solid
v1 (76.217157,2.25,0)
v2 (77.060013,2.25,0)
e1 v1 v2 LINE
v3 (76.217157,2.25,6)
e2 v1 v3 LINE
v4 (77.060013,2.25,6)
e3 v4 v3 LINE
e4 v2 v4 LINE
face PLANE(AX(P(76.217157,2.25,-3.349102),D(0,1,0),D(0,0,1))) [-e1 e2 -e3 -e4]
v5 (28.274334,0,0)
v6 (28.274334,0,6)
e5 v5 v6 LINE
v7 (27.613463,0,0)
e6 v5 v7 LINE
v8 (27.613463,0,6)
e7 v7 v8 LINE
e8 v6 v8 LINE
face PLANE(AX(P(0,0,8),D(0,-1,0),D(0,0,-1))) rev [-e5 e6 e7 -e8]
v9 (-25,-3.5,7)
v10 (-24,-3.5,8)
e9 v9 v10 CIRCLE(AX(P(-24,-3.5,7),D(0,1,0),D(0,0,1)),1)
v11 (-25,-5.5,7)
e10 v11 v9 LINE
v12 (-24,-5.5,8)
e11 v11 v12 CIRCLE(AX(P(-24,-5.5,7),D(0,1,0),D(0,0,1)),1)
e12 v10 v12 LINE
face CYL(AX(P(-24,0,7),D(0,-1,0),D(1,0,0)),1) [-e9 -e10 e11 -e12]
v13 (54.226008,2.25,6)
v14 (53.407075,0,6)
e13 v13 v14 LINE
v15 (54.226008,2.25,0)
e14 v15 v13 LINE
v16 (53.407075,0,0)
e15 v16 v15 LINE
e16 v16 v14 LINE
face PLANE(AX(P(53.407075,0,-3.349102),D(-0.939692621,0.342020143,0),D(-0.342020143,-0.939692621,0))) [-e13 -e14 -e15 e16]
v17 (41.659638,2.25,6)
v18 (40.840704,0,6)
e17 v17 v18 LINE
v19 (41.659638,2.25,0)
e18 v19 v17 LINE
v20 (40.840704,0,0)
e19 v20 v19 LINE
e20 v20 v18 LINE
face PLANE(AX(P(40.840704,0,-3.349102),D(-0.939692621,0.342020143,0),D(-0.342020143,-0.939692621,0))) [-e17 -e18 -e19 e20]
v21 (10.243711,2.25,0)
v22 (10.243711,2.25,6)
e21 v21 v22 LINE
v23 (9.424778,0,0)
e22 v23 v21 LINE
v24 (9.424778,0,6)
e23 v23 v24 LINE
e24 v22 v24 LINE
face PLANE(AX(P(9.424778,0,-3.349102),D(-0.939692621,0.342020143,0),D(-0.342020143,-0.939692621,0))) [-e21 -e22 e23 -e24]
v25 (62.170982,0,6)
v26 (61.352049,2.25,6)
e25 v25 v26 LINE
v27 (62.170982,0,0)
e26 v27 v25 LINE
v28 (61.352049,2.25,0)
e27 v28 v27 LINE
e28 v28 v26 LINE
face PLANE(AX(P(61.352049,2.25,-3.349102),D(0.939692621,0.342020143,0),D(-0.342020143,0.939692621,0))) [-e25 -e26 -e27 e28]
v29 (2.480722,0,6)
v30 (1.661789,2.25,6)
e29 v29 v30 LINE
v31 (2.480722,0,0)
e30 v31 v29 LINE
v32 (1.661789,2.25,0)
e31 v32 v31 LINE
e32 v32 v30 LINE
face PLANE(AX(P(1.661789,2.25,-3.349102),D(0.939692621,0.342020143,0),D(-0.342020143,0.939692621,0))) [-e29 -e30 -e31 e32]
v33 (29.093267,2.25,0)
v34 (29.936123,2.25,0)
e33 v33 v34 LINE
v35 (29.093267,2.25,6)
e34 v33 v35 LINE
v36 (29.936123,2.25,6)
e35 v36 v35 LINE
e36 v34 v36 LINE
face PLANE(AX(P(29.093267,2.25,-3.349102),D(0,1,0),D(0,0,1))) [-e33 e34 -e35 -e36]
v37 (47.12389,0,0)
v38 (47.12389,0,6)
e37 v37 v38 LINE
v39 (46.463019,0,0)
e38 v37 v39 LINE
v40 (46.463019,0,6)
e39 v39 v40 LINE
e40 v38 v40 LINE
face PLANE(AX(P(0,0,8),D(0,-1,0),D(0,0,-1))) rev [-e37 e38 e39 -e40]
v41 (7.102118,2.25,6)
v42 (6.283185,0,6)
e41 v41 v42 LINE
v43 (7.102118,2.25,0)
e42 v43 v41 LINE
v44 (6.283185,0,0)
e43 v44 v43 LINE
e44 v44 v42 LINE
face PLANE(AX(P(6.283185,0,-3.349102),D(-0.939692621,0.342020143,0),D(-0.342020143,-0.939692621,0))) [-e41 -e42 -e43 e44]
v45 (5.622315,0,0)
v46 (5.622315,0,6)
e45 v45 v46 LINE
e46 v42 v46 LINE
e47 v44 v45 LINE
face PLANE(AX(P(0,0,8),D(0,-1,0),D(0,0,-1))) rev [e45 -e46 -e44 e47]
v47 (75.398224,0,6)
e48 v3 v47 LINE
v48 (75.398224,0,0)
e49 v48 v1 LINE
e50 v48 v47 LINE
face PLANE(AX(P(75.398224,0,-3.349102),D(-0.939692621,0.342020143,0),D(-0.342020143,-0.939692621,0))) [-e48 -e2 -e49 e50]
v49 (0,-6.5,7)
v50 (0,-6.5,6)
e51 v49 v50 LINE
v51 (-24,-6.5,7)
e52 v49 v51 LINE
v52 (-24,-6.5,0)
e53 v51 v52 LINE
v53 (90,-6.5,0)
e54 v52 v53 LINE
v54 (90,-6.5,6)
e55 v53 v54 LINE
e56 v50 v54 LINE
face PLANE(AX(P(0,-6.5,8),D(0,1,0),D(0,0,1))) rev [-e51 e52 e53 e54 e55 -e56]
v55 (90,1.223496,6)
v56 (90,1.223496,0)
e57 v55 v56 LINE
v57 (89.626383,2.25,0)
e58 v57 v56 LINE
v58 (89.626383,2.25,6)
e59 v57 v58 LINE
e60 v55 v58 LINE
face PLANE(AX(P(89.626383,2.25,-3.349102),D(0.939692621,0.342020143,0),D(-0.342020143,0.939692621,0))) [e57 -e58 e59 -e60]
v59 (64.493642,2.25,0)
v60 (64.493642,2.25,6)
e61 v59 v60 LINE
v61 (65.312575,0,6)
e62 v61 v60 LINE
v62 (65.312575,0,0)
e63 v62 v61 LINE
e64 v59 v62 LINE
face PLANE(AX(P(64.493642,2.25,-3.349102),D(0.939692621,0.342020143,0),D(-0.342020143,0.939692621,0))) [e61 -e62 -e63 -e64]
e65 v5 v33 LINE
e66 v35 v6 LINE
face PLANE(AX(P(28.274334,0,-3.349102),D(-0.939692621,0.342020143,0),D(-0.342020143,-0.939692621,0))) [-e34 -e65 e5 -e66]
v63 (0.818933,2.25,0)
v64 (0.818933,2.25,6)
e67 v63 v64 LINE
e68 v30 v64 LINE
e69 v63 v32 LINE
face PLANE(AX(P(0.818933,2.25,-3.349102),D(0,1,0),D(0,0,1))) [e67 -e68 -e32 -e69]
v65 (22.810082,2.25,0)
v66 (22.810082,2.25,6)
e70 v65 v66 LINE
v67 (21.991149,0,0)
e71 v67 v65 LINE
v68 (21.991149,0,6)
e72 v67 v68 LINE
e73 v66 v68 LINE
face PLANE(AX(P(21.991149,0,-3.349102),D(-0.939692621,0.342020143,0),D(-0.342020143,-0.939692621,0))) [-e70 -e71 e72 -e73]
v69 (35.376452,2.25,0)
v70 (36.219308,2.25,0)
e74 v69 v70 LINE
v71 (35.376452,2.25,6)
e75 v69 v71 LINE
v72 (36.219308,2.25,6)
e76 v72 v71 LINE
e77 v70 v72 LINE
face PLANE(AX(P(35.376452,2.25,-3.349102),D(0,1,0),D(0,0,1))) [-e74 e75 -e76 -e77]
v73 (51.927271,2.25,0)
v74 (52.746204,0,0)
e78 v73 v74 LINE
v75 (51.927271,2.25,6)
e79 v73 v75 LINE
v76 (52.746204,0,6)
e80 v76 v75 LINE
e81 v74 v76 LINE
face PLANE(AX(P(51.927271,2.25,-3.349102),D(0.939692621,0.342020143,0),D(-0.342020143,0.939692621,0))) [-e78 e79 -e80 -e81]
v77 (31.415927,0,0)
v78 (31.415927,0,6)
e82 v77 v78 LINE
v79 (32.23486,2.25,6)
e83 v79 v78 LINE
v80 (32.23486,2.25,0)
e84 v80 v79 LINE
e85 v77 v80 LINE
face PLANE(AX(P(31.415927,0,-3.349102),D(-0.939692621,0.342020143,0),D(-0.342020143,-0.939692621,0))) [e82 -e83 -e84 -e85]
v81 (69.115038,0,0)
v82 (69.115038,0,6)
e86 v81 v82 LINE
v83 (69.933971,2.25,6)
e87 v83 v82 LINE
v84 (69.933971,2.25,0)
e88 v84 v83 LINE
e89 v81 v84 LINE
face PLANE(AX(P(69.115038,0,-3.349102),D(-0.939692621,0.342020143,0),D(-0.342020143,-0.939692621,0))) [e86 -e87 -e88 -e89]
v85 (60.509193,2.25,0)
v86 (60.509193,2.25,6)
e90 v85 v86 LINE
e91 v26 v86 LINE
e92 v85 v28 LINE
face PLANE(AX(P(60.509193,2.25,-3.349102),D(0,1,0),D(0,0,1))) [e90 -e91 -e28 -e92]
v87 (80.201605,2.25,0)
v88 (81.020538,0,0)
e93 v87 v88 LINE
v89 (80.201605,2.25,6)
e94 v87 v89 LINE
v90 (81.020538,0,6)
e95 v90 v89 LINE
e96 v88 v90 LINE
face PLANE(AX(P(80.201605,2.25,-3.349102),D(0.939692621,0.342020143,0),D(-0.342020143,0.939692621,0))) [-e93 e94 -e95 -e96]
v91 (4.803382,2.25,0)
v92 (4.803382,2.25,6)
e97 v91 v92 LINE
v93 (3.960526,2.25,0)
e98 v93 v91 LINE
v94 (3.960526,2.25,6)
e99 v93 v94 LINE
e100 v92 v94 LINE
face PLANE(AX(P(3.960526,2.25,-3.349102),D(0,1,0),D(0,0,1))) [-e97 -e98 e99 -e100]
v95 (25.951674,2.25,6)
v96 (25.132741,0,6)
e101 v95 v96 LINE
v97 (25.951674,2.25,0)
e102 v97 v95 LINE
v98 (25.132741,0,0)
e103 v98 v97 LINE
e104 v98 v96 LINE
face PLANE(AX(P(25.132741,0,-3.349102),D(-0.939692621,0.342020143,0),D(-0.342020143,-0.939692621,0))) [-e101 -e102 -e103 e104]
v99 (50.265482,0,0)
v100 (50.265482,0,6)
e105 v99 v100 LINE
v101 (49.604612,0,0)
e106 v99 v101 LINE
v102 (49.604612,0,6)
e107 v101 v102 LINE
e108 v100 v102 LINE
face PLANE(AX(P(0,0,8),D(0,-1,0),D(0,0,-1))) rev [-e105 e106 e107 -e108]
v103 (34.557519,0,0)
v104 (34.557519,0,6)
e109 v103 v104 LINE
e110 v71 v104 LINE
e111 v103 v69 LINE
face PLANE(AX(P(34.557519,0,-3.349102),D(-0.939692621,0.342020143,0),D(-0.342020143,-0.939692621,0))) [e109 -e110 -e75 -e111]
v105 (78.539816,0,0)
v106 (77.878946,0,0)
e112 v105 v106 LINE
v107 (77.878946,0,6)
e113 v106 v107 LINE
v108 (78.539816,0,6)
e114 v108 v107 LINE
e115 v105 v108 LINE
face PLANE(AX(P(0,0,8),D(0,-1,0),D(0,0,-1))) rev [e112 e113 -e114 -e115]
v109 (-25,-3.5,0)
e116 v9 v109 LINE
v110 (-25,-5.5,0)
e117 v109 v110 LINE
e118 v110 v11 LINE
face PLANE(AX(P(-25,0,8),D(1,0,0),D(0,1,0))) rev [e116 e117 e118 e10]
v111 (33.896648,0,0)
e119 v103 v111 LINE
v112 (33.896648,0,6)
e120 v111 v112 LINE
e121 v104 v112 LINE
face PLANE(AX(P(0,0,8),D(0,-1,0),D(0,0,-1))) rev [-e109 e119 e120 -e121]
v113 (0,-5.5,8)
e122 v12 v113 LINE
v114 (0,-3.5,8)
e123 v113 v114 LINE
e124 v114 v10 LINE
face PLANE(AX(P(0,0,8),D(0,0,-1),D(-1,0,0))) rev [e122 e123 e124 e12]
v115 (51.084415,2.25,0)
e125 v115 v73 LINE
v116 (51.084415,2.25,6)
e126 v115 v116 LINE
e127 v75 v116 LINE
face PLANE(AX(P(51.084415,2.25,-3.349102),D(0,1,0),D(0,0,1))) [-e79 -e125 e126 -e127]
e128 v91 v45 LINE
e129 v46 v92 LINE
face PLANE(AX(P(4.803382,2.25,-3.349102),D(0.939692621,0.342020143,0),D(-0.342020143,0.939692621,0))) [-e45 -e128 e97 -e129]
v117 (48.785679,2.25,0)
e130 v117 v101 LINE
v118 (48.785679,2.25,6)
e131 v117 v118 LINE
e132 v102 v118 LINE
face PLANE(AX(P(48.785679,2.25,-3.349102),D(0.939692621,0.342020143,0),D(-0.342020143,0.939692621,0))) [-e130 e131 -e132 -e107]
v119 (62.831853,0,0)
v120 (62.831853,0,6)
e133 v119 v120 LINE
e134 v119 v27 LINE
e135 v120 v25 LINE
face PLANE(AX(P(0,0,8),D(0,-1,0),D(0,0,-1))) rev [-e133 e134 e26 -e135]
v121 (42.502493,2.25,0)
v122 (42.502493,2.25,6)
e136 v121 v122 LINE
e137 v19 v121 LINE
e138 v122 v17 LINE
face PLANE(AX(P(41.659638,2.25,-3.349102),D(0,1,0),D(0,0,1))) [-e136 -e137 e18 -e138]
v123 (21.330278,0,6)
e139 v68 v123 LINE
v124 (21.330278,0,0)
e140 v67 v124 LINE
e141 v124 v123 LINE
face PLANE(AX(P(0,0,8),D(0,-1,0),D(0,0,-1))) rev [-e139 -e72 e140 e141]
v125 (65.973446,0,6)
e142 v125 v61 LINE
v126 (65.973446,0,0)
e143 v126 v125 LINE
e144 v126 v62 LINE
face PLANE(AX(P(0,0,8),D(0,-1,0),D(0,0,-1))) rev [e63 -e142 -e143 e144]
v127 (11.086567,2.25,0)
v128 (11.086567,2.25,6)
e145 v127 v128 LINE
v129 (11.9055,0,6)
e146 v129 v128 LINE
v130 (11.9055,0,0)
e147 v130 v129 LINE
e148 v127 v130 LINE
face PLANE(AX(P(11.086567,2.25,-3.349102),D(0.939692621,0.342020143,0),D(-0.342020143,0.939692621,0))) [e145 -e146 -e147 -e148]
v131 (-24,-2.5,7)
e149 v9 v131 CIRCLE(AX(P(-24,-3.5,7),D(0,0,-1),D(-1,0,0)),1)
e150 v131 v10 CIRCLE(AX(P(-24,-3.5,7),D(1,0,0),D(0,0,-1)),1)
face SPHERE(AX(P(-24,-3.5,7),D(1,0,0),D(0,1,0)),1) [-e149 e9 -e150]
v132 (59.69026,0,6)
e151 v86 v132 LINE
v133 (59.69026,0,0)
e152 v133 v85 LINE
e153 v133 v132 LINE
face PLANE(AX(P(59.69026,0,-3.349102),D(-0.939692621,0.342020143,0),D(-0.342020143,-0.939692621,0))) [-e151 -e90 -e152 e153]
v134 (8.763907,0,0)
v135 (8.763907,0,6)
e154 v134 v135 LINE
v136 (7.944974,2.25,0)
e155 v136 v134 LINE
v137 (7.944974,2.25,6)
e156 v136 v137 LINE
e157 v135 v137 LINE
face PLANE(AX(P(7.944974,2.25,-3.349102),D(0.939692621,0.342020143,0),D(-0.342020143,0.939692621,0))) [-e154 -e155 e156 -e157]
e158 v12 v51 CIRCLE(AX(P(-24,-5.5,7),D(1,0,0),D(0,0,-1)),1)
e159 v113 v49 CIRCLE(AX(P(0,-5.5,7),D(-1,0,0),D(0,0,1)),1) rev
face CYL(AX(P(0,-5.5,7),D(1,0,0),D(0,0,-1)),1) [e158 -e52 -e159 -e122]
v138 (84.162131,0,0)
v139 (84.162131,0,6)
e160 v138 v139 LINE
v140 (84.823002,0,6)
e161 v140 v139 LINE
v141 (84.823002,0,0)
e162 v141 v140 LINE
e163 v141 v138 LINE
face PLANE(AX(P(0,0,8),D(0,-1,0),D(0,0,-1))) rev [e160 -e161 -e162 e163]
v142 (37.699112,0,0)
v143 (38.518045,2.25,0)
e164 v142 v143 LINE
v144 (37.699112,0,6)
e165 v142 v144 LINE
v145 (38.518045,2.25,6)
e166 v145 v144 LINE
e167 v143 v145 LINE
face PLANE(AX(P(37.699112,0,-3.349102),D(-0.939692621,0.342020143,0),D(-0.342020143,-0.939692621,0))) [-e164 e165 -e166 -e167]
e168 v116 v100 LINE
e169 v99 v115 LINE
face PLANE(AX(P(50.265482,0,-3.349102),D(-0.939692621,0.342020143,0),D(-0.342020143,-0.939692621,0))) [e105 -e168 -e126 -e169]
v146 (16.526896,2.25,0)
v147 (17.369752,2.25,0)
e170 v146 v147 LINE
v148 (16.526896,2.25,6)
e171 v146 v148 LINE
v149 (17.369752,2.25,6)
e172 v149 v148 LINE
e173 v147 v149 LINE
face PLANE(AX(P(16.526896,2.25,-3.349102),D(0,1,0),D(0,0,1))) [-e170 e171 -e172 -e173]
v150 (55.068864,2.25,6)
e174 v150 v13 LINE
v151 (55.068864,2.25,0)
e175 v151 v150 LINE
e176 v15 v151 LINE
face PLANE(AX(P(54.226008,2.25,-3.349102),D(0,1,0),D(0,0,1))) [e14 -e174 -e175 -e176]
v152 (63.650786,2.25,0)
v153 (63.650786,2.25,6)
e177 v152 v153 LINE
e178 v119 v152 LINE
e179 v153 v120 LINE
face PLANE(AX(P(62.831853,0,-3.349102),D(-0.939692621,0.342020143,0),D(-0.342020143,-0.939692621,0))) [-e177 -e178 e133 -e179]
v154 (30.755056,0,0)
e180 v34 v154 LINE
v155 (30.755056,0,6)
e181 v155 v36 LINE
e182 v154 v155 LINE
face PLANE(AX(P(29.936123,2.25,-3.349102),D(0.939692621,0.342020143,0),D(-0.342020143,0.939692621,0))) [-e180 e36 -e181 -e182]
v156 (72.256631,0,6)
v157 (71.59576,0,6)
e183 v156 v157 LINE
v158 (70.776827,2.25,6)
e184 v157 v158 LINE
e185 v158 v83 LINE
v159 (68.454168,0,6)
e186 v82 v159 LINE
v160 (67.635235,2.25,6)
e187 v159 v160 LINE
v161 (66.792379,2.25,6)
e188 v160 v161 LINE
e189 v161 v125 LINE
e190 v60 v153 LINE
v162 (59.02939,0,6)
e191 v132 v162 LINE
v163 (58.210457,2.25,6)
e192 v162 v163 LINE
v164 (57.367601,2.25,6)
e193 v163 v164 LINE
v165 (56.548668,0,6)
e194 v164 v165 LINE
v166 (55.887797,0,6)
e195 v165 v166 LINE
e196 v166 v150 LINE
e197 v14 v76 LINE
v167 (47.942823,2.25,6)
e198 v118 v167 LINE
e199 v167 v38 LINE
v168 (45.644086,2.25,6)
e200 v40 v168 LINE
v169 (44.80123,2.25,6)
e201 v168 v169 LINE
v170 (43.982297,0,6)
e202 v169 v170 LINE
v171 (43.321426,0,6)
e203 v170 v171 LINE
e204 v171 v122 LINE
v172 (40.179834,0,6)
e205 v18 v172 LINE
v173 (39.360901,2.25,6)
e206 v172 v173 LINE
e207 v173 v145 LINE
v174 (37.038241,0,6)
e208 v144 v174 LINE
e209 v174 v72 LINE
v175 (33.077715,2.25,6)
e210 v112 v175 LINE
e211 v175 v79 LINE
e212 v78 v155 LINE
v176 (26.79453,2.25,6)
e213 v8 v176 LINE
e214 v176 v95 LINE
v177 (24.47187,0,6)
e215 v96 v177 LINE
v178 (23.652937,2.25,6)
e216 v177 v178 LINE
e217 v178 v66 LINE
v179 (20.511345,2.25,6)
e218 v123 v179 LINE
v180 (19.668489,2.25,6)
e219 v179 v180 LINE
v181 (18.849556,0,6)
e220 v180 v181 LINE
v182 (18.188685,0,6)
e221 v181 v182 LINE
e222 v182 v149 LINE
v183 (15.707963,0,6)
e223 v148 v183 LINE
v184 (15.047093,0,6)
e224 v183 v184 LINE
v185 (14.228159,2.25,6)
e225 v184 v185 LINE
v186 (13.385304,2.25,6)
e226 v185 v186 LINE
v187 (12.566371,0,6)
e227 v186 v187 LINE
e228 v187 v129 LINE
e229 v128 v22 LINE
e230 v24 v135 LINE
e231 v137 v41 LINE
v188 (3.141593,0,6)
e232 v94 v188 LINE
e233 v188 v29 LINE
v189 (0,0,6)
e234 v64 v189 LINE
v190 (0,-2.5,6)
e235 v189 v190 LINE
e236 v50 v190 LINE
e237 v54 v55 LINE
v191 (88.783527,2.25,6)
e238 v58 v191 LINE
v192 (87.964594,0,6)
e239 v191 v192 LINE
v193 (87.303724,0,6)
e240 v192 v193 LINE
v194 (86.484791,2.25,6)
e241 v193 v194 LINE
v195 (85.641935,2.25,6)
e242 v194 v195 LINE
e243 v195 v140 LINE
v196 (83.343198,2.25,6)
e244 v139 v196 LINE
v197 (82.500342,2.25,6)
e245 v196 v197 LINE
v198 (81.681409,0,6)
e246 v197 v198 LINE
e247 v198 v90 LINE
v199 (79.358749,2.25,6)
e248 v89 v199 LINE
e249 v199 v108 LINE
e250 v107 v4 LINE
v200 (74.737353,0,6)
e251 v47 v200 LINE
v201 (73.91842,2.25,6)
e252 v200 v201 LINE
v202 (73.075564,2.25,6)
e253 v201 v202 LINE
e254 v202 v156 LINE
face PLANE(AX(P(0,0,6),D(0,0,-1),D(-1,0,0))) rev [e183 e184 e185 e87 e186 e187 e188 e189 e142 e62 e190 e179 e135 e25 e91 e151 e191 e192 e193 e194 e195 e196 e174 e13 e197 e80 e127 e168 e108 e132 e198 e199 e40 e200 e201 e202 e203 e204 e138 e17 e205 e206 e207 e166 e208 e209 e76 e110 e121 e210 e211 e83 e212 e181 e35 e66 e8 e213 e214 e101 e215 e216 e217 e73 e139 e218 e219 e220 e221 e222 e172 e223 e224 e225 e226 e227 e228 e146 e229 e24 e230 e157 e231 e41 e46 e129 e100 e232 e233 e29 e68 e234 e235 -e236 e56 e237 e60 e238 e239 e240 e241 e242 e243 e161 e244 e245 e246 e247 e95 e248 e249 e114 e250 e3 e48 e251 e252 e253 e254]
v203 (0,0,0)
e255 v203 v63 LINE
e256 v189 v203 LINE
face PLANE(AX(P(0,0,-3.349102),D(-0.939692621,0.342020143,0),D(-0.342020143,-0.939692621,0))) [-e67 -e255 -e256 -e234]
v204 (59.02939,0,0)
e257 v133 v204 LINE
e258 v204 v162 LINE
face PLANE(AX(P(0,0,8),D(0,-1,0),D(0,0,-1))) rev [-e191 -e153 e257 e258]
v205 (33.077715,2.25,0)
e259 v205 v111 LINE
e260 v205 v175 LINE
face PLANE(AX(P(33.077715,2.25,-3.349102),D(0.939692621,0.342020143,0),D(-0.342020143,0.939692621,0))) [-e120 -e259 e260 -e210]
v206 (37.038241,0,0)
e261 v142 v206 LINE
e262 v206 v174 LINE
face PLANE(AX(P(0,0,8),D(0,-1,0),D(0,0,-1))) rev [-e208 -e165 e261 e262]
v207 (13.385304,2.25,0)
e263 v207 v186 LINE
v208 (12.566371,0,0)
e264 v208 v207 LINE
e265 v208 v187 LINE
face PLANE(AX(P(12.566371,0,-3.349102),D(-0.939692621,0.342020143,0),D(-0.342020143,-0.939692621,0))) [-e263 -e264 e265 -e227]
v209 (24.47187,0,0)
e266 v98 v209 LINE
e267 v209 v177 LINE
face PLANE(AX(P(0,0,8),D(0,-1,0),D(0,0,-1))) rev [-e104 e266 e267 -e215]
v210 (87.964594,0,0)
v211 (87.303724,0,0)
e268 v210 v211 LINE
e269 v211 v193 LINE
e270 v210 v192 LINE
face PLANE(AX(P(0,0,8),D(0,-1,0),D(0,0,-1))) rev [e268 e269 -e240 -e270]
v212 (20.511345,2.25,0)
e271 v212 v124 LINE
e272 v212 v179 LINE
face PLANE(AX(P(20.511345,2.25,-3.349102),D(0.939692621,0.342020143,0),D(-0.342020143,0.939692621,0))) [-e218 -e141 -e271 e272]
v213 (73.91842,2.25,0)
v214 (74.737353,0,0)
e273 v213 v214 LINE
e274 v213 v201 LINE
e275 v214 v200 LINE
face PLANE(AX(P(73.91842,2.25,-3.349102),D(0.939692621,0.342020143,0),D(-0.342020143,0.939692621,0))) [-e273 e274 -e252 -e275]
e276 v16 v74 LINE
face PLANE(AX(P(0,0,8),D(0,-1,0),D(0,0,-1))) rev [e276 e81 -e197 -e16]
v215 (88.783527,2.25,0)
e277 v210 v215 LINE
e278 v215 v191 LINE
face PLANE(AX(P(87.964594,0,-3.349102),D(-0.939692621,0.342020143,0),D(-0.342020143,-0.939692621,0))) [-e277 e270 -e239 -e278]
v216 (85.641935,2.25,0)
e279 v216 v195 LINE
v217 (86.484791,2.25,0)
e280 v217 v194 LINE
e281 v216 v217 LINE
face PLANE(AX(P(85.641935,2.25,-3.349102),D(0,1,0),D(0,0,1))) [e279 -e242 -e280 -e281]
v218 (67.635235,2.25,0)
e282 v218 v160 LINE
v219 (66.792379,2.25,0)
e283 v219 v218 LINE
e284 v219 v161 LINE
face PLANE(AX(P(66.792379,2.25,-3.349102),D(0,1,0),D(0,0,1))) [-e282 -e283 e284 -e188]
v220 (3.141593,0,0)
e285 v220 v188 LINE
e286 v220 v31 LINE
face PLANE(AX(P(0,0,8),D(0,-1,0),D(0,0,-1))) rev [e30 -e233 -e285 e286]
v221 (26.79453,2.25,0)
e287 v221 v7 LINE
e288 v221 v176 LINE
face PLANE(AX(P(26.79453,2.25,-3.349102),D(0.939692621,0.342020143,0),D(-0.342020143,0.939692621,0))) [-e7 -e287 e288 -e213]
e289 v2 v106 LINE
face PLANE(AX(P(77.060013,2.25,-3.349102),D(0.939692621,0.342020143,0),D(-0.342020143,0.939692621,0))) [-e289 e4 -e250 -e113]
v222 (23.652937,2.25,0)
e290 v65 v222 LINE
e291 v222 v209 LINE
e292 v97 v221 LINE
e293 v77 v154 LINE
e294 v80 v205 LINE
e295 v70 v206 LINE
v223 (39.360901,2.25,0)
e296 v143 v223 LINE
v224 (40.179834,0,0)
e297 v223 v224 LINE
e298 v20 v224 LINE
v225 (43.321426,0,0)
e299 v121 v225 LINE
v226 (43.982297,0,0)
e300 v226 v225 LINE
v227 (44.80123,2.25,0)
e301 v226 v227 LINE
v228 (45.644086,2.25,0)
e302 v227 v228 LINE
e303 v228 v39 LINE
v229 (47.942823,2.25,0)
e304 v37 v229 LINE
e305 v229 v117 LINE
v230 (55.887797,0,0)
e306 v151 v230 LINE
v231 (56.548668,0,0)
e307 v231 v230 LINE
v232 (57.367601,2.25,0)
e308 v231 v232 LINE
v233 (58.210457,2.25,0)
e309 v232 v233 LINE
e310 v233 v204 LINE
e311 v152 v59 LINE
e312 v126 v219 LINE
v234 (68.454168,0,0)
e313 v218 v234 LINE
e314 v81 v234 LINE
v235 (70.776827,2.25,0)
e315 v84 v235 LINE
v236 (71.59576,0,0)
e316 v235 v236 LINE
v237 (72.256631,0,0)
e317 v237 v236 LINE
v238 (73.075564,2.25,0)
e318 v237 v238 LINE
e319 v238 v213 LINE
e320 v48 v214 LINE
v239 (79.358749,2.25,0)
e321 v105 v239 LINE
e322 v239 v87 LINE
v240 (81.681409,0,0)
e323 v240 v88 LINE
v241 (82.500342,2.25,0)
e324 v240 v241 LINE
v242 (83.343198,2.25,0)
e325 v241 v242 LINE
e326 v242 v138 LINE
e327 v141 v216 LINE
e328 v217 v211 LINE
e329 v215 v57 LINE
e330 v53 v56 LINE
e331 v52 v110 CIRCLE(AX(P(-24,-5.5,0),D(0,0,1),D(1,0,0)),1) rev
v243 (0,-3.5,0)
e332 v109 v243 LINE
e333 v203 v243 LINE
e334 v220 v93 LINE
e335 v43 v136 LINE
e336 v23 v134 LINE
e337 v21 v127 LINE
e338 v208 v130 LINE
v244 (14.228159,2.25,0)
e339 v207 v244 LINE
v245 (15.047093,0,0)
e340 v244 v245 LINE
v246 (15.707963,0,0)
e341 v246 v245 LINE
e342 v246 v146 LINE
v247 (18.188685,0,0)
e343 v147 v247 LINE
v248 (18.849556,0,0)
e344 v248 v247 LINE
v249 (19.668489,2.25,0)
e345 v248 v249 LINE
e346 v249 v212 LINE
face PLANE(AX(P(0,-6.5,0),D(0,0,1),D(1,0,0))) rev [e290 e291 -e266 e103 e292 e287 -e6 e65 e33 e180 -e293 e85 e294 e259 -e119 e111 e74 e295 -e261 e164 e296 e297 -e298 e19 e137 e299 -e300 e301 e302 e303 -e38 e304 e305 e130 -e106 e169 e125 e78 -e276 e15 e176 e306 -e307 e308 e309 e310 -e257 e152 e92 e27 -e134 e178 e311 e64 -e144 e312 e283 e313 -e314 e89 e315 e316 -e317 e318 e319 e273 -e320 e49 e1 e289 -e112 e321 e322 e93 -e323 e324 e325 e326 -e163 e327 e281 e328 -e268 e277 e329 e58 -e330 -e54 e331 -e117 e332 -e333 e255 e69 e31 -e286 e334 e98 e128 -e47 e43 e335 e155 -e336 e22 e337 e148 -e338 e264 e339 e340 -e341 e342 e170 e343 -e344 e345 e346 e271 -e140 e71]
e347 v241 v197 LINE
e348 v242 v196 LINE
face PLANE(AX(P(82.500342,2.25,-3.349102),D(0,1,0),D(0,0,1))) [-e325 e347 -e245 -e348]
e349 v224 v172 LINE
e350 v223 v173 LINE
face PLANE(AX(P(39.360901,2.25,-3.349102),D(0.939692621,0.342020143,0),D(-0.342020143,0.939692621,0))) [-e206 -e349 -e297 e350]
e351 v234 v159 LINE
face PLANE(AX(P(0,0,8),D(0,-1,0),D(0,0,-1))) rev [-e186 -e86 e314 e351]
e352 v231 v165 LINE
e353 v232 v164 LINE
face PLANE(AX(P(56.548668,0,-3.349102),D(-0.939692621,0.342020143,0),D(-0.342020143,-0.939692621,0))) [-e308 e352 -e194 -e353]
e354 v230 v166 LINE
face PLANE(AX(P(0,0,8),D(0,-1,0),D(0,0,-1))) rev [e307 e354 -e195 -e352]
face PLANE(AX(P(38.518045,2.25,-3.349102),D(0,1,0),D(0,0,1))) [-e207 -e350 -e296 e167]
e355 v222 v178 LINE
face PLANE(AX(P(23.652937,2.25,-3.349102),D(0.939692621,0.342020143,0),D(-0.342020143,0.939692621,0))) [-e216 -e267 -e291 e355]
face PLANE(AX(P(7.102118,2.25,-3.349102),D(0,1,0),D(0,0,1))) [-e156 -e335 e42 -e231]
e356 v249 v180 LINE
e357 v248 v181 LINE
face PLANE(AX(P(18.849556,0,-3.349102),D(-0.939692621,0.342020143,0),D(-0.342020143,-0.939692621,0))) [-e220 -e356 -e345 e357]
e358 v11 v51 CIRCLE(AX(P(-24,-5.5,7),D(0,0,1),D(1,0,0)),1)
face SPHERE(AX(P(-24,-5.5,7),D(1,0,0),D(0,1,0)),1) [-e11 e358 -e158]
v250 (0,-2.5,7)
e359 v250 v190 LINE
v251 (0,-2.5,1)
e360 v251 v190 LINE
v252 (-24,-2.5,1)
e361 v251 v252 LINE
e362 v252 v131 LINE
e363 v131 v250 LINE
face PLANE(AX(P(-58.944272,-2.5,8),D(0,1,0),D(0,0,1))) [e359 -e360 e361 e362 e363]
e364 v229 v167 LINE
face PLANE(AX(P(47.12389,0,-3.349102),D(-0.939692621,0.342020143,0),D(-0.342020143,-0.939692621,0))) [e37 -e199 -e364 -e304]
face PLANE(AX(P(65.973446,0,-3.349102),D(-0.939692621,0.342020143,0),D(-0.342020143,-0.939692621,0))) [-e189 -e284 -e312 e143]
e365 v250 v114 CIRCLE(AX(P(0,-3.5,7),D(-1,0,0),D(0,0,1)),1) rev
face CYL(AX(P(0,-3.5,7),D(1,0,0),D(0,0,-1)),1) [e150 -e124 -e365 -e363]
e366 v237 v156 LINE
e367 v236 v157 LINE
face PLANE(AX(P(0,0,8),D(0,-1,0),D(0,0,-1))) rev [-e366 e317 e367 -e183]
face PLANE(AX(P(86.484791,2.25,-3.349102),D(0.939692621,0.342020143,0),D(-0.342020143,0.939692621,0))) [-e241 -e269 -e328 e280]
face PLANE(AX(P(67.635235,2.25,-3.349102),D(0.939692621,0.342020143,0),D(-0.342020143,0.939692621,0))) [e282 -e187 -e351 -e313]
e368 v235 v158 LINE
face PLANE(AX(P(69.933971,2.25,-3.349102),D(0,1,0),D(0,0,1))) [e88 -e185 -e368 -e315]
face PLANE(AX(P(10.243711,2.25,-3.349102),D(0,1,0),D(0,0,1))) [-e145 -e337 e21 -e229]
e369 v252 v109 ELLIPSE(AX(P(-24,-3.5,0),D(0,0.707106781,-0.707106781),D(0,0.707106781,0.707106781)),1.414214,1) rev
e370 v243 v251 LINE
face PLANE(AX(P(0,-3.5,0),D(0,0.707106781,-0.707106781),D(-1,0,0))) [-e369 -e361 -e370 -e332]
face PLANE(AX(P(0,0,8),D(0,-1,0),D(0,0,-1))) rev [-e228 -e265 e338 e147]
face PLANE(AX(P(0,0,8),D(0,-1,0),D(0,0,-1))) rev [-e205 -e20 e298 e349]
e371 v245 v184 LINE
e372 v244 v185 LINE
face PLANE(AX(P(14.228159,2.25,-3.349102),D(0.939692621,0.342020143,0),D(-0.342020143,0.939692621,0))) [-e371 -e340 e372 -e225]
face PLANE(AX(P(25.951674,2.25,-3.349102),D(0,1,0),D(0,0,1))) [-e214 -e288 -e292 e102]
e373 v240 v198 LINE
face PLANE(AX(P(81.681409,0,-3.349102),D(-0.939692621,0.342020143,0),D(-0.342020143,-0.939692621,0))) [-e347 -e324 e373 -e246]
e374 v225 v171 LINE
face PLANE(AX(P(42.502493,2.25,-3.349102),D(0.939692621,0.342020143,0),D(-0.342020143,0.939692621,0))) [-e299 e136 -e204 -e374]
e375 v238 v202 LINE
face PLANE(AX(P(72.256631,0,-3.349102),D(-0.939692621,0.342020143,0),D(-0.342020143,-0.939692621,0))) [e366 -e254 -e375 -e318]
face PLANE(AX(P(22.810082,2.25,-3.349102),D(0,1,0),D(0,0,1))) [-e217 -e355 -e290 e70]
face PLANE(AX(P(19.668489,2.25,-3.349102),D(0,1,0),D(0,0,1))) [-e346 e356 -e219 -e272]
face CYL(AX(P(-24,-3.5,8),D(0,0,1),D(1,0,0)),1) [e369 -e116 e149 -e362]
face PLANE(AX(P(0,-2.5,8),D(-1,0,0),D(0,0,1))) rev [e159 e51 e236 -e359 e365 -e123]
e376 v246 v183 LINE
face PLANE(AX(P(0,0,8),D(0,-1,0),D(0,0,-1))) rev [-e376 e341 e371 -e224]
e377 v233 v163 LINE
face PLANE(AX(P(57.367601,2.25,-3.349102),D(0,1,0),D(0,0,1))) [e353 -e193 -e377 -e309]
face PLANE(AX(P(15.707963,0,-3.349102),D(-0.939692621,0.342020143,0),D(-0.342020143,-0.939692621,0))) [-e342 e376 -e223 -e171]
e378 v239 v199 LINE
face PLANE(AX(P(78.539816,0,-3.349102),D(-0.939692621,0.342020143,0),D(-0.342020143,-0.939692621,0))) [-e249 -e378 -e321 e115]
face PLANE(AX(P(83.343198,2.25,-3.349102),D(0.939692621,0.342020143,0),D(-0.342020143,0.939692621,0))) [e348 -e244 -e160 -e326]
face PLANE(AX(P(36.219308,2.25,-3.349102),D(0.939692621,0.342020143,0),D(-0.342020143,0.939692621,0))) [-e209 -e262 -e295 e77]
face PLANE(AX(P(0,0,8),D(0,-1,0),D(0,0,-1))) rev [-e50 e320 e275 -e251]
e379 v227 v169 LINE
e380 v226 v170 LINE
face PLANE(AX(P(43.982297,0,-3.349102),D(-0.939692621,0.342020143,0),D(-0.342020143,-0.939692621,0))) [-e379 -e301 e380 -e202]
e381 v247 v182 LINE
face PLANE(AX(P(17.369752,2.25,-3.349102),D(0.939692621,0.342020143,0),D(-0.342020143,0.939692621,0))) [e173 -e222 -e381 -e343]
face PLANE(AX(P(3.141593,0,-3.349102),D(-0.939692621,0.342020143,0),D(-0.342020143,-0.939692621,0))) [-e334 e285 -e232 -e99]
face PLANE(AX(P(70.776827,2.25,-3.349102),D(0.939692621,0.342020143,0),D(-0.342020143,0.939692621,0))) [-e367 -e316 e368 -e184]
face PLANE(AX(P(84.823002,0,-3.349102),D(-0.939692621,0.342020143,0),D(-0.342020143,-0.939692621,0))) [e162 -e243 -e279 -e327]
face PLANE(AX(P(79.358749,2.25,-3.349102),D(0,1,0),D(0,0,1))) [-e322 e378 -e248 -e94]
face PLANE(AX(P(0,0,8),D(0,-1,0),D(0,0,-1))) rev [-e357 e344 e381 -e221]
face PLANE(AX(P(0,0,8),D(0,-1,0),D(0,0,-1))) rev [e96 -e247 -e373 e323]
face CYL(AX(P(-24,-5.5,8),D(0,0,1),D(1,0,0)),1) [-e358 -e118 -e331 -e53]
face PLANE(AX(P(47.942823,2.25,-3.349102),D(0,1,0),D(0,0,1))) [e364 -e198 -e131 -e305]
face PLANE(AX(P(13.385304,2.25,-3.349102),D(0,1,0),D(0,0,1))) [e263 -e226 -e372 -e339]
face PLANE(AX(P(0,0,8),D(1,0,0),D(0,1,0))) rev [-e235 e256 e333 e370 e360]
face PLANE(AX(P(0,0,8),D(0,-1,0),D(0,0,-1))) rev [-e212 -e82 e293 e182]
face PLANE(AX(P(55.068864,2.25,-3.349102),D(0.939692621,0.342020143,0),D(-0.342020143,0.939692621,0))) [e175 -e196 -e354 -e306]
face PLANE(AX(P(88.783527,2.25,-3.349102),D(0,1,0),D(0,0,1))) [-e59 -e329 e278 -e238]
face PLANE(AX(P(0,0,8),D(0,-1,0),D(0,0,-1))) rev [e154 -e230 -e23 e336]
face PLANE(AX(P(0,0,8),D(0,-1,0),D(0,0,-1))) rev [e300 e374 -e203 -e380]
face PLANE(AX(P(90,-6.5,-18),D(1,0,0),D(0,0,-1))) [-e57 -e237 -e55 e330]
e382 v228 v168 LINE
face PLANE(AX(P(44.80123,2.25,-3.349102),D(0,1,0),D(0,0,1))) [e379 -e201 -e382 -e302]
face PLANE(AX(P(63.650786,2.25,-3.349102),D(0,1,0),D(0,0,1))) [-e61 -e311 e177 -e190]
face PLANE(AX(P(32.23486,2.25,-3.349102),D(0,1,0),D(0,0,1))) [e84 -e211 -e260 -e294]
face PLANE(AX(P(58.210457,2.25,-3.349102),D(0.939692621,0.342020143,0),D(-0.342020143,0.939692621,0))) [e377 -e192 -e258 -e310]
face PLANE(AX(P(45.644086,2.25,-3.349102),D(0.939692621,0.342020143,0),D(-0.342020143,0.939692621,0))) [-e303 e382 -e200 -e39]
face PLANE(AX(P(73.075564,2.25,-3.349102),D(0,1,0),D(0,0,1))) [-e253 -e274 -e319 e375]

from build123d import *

# Parameters (mm, degrees)
SKETCH_1_W             = 135.088484104
SKETCH_1_H             = 6.5
EXTRUDE_1_DEPTH        = 8
EXTRUDE_2_DEPTH        = 8
PATTERN_LINEAR_1_COUNT = 43
PATTERN_LINEAR_1_PITCH = 3.141592654
SKETCH_3_OUTSIDE_W     = 164.21
SKETCH_3_OUTSIDE_H     = 37.872
SKETCH_3_OUTSIDE_W_2   = 90
SKETCH_3_OUTSIDE_H_2   = 28.626420759
CUT_EXTRUDE_1_DEPTH    = 26
SKETCH_4_W             = 8
SKETCH_4_H             = 4
EXTRUDE_1_2_DEPTH      = 115
CUT_EXTRUDE_2_DEPTH    = 2
SKETCH_7_W             = 25
SKETCH_7_H             = 4
EXTRUDE_3_DEPTH        = 2
FILLET_1_R             = 1
FILLET_2_R             = 1
CHAMFER_1_SIZE         = 1


with BuildPart() as part:
    # 草图1 → Extrude 1 (new body)
    with BuildSketch(Plane.XY):
        with Locations((67.544242052, -3.25)):
            Rectangle(SKETCH_1_W, SKETCH_1_H)
    extrude(amount=EXTRUDE_1_DEPTH)

    # 草图2 → Extrude 2 (add)
    with BuildSketch(Plane.XY.offset(8)):
        Polygon((0, 0), (0.818933027, 2.25), (1.661788885, 2.25), (2.480721912, 0), align=None)
    extrude_2 = extrude(amount=-EXTRUDE_2_DEPTH)

    # 阵列(线性)1: Extrude 2 ×43
    with Locations(*[(i * PATTERN_LINEAR_1_PITCH, 0, 0) for i in range(1, PATTERN_LINEAR_1_COUNT)]):
        add(extrude_2)

    # 草图3 outside → 切除-拉伸1 (cut)
    with BuildSketch(Plane.XY.offset(8)):
        with Locations((67.544, -2.125)):
            Rectangle(SKETCH_3_OUTSIDE_W, SKETCH_3_OUTSIDE_H)
        with Locations((45, 7.81321038)):
            Rectangle(SKETCH_3_OUTSIDE_W_2, SKETCH_3_OUTSIDE_H_2, mode=Mode.SUBTRACT)
    extrude(amount=-CUT_EXTRUDE_1_DEPTH, mode=Mode.SUBTRACT)

    # 草图4 → Extrude 1 2 (add)
    with BuildSketch(Plane(origin=(90, 0, 0), x_dir=(0, 0, -1), z_dir=(1, 0, 0))):
        with Locations((-4, -4.5)):
            Rectangle(SKETCH_4_W, SKETCH_4_H)
    extrude(amount=-EXTRUDE_1_2_DEPTH)

    # 草图5 → 切除-拉伸2 (cut)
    with BuildSketch(Plane.XY.offset(8)):
        Polygon((0, 0), (0, -2.5), (-25, -2.5), (-25, -6.5), (90, -6.5), (90, 1.22349624), (89.626383186, 2.25), (88.783527328, 2.25), (87.964594301, 0), (87.303723559, 0), (86.484790532, 2.25), (85.641934674, 2.25), (84.823001647, 0), (84.162130906, 0), (83.343197879, 2.25), (82.50034202, 2.25), (81.681408993, 0), (81.020538252, 0), (80.201605225, 2.25), (79.358749367, 2.25), (78.53981634, 0), (77.878945599, 0), (77.060012572, 2.25), (76.217156713, 2.25), (75.398223686, 0), (74.737352945, 0), (73.918419918, 2.25), (73.07556406, 2.25), (72.256631033, 0), (71.595760291, 0), (70.776827264, 2.25), (69.933971406, 2.25), (69.115038379, 0), (68.454167638, 0), (67.635234611, 2.25), (66.792378752, 2.25), (65.973445725, 0), (65.312574984, 0), (64.493641957, 2.25), (63.650786099, 2.25), (62.831853072, 0), (62.170982331, 0), (61.352049304, 2.25), (60.509193445, 2.25), (59.690260418, 0), (59.029389677, 0), (58.21045665, 2.25), (57.367600792, 2.25), (56.548667765, 0), (55.887797023, 0), (55.068863996, 2.25), (54.226008138, 2.25), (53.407075111, 0), (52.74620437, 0), (51.927271343, 2.25), (51.084415485, 2.25), (50.265482457, 0), (49.604611716, 0), (48.785678689, 2.25), (47.942822831, 2.25), (47.123889804, 0), (46.463019063, 0), (45.644086036, 2.25), (44.801230177, 2.25), (43.98229715, 0), (43.321426409, 0), (42.502493382, 2.25), (41.659637524, 2.25), (40.840704497, 0), (40.179833756, 0), (39.360900728, 2.25), (38.51804487, 2.25), (37.699111843, 0), (37.038241102, 0), (36.219308075, 2.25), (35.376452217, 2.25), (34.557519189, 0), (33.896648448, 0), (33.077715421, 2.25), (32.234859563, 2.25), (31.415926536, 0), (30.755055795, 0), (29.936122768, 2.25), (29.093266909, 2.25), (28.274333882, 0), (27.613463141, 0), (26.794530114, 2.25), (25.951674256, 2.25), (25.132741229, 0), (24.471870488, 0), (23.65293746, 2.25), (22.810081602, 2.25), (21.991148575, 0), (21.330277834, 0), (20.511344807, 2.25), (19.668488949, 2.25), (18.849555922, 0), (18.18868518, 0), (17.369752153, 2.25), (16.526896295, 2.25), (15.707963268, 0), (15.047092527, 0), (14.2281595, 2.25), (13.385303641, 2.25), (12.566370614, 0), (11.905499873, 0), (11.086566846, 2.25), (10.243710988, 2.25), (9.424777961, 0), (8.76390722, 0), (7.944974193, 2.25), (7.102118334, 2.25), (6.283185307, 0), (5.622314566, 0), (4.803381539, 2.25), (3.960525681, 2.25), (3.141592654, 0), (2.480721912, 0), (1.661788885, 2.25), (0.818933027, 2.25), align=None)
    extrude(amount=-CUT_EXTRUDE_2_DEPTH, mode=Mode.SUBTRACT)

    # 草图7 → 凸台-拉伸3 (add)
    with BuildSketch(Plane.XY.offset(6)):
        with Locations((-12.5, -4.5)):
            Rectangle(SKETCH_7_W, SKETCH_7_H)
    extrude(amount=EXTRUDE_3_DEPTH)

    # 圆角1
    fillet_1_edges = [part.edges().sort_by_distance(p)[0] for p in [
        (-12.5, -2.5, 8),
        (-12.5, -6.5, 8),
    ]]
    fillet(fillet_1_edges, radius=FILLET_1_R)

    # 圆角2
    fillet_2_edges = [part.edges().sort_by_distance(p)[0] for p in [
        (-25, -4.5, 8),
        (-25, -2.5, 3.5),
        (-25, -2.792893219, 7.707106781),
        (-25, -6.207106781, 7.707106781),
        (-25, -6.5, 3.5),
    ]]
    fillet(fillet_2_edges, radius=FILLET_2_R)

    # 倒角1
    # the kernel refuses this chamfer: 1 mm, written as the material it takes off along each edge
    with BuildSketch(Plane(origin=(0, -2.5, 0), x_dir=(0, 0.027495876610586494, 0.9996219169112968), z_dir=(-1, 0, 0))) as chamfer_1_piece_1:
        Polygon((CHAMFER_1_SIZE * 0.999621916911, -CHAMFER_1_SIZE * 0.0274958766106), (-CHAMFER_1_SIZE * 0.0274958766106, -CHAMFER_1_SIZE * 0.999621916911), (0, 0), align=None)
    extrude(amount=26.571682988, mode=Mode.SUBTRACT)


solid = part.part
